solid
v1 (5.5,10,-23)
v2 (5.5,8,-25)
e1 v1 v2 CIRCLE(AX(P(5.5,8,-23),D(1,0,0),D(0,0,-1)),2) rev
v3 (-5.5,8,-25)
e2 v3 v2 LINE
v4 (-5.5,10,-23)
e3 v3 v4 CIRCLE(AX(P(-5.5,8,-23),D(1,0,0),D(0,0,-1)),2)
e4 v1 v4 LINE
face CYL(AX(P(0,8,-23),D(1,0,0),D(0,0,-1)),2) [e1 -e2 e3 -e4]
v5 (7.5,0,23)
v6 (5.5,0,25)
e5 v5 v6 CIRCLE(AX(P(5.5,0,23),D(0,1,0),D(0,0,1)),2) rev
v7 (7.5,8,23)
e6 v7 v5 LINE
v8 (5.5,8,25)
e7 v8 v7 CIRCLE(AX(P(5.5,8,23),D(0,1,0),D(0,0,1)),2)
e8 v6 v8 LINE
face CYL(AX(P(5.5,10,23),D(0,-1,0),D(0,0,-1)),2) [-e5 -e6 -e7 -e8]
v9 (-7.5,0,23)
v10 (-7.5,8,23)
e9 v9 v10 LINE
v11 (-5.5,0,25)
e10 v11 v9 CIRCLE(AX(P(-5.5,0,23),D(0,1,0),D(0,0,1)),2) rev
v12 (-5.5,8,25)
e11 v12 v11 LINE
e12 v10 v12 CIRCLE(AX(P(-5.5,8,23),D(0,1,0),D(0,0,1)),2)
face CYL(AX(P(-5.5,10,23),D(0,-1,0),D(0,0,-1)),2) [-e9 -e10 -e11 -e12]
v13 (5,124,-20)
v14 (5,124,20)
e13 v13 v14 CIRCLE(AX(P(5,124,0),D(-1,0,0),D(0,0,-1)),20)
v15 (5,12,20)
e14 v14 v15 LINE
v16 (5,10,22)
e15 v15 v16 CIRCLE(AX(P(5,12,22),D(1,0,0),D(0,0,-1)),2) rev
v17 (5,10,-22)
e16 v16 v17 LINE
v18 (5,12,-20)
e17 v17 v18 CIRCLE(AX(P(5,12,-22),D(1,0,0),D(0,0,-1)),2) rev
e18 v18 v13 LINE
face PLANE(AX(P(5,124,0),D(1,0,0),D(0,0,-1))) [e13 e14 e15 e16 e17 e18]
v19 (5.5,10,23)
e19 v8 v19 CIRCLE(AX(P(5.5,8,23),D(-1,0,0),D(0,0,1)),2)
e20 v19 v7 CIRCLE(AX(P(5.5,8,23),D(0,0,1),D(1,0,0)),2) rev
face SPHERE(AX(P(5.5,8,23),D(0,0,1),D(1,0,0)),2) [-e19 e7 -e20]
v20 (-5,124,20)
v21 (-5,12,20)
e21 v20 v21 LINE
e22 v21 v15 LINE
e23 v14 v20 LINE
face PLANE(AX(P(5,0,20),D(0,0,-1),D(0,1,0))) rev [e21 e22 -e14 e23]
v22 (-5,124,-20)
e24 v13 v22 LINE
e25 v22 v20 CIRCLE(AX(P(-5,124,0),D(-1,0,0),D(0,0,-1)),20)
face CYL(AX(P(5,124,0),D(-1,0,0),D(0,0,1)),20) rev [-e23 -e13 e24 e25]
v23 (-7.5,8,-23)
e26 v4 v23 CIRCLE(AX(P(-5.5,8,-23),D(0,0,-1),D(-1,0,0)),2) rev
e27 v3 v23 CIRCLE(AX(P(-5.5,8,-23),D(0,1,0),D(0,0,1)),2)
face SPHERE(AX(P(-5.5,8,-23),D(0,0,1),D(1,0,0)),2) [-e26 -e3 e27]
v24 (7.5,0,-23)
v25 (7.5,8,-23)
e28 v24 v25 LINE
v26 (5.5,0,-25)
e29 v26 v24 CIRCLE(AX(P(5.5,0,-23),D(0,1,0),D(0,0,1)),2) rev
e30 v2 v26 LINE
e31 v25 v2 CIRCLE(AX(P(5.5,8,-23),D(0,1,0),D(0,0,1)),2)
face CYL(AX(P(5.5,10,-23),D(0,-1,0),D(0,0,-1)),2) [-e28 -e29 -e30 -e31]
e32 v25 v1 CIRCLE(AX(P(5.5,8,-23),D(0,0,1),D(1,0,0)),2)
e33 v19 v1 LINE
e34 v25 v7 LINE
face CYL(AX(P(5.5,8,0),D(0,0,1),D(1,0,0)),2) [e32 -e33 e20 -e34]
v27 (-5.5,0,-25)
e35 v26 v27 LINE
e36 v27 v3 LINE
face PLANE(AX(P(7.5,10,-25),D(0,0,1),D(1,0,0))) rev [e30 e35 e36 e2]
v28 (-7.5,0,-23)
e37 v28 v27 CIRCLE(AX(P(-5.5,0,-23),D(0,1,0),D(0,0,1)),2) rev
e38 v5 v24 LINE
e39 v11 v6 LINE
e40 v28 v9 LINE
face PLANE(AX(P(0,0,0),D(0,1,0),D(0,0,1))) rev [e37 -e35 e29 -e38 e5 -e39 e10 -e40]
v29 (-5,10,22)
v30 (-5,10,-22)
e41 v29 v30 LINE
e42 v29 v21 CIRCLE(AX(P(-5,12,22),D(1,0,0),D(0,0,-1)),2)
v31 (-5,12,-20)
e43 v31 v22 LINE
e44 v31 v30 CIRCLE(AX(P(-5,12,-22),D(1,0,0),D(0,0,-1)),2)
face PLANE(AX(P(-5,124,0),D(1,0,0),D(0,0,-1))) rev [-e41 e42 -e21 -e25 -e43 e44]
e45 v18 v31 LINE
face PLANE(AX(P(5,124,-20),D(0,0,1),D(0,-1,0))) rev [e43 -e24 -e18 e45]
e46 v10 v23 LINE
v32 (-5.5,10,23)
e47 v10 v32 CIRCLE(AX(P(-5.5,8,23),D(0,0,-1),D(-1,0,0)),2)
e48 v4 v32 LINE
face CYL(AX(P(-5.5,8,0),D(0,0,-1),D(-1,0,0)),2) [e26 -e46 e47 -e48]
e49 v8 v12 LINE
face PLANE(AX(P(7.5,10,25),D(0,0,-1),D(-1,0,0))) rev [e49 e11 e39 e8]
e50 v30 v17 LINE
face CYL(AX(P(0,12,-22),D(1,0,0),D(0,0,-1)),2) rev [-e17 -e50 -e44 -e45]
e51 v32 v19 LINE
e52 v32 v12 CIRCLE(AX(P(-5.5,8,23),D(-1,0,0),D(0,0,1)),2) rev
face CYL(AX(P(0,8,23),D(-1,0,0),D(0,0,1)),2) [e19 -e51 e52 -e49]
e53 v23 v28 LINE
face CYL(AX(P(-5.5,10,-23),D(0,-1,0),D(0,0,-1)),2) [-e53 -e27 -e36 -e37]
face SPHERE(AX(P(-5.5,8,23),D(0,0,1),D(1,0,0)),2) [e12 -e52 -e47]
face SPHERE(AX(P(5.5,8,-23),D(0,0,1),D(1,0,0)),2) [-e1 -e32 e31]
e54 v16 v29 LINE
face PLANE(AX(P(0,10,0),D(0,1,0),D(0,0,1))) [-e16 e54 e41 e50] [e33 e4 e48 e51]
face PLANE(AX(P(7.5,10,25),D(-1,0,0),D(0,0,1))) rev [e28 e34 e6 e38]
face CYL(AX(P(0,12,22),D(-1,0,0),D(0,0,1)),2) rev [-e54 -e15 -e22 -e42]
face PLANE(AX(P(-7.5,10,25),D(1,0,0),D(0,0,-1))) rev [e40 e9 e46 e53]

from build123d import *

# Parameters (mm, degrees)
SKETCH_1_W      = 15
SKETCH_1_H      = 50
EXTRUDE_1_DEPTH = 10
FILLET_1_R      = 2
FILLET_2_R      = 2
EXTRUDE_3_DEPTH = 5
FILLET_3_R      = 2


with BuildPart() as part:
    # 스케치1 → 보스-돌출1 (new body)
    with BuildSketch(Plane(origin=(0, 0, 0), x_dir=(1, 0, 0), z_dir=(0, 1, 0))):
        Rectangle(SKETCH_1_W, SKETCH_1_H)
    extrude(amount=EXTRUDE_1_DEPTH)

    # 필렛1
    fillet_1_edges = [part.edges().sort_by_distance(p)[0] for p in [
        (7.5, 10, 0),
        (0, 10, -25),
        (-7.5, 10, 0),
        (0, 10, 25),
    ]]
    fillet(fillet_1_edges, radius=FILLET_1_R)

    # 필렛2
    # the kernel refuses this fillet: 2 mm, written as the material it takes off along each edge
    with BuildSketch(Plane(origin=(-5.5, 8, 23), x_dir=(-1, 0, 0), z_dir=(0, 0, 1))) as fillet_2_piece_1_section:
        Polygon((0, 0), (FILLET_2_R, 0), (FILLET_2_R, -FILLET_2_R), (0, -FILLET_2_R), align=None)
    fillet_2_piece_1 = extrude(amount=FILLET_2_R, mode=Mode.PRIVATE)
    fillet_2_piece_1 = fillet_2_piece_1 - Plane(origin=(-5.5, 8, 23), x_dir=(0.7071067811865475, -0.7071067811865475, 0), z_dir=(0, 0, 1)) * Sphere(FILLET_2_R, mode=Mode.PRIVATE)
    add(fillet_2_piece_1, mode=Mode.SUBTRACT)
    with BuildSketch(Plane(origin=(-5.5, 8, -23), x_dir=(0, 0, -1), z_dir=(-1, 0, 0))) as fillet_2_piece_2_section:
        Polygon((0, 0), (FILLET_2_R, 0), (FILLET_2_R, -FILLET_2_R), (0, -FILLET_2_R), align=None)
    fillet_2_piece_2 = extrude(amount=FILLET_2_R, mode=Mode.PRIVATE)
    fillet_2_piece_2 = fillet_2_piece_2 - Plane(origin=(-5.5, 8, -23), x_dir=(0, -0.7071067811865475, 0.7071067811865475), z_dir=(-1, 0, 0)) * Sphere(FILLET_2_R, mode=Mode.PRIVATE)
    add(fillet_2_piece_2, mode=Mode.SUBTRACT)
    with BuildSketch(Plane(origin=(5.5, 8, 23), x_dir=(1, 0, 0), z_dir=(0, 0, 1))) as fillet_2_piece_3_section:
        Polygon((0, 0), (FILLET_2_R, 0), (FILLET_2_R, FILLET_2_R), (0, FILLET_2_R), align=None)
    fillet_2_piece_3 = extrude(amount=FILLET_2_R, mode=Mode.PRIVATE)
    fillet_2_piece_3 = fillet_2_piece_3 - Plane(origin=(5.5, 8, 23), x_dir=(-0.7071067811865475, -0.7071067811865475, 0), z_dir=(0, 0, 1)) * Sphere(FILLET_2_R, mode=Mode.PRIVATE)
    add(fillet_2_piece_3, mode=Mode.SUBTRACT)
    with BuildSketch(Plane(origin=(5.5, 8, -23), x_dir=(0, 0, -1), z_dir=(1, 0, 0))) as fillet_2_piece_4_section:
        Polygon((0, 0), (FILLET_2_R, 0), (FILLET_2_R, FILLET_2_R), (0, FILLET_2_R), align=None)
    fillet_2_piece_4 = extrude(amount=FILLET_2_R, mode=Mode.PRIVATE)
    fillet_2_piece_4 = fillet_2_piece_4 - Plane(origin=(5.5, 8, -23), x_dir=(0, -0.7071067811865475, 0.7071067811865475), z_dir=(1, 0, 0)) * Sphere(FILLET_2_R, mode=Mode.PRIVATE)
    add(fillet_2_piece_4, mode=Mode.SUBTRACT)
    with BuildSketch(Plane(origin=(7.5, -5, -25), x_dir=(0, 0, 1), z_dir=(0, 1, 0)), Plane(origin=(7.5, -5, 25), x_dir=(-1, 0, 0), z_dir=(0, 1, 0))) as fillet_2_piece_5:
        with BuildLine():
            CenterArc((FILLET_2_R, -FILLET_2_R), FILLET_2_R, 90, 90)
            Line((0, -FILLET_2_R), (0, 0))
            Line((0, 0), (FILLET_2_R, 0))
        make_face()
    extrude(amount=13, mode=Mode.SUBTRACT)
    with BuildSketch(Plane(origin=(-7.5, -5, 25), x_dir=(1, 0, 0), z_dir=(0, 1, 0)), Plane(origin=(-7.5, -5, -25), x_dir=(0, 0, 1), z_dir=(0, 1, 0))) as fillet_2_piece_6:
        with BuildLine():
            CenterArc((FILLET_2_R, FILLET_2_R), FILLET_2_R, 180, 90)
            Line((0, FILLET_2_R), (0, 0))
            Line((0, 0), (FILLET_2_R, 0))
        make_face()
    extrude(amount=13, mode=Mode.SUBTRACT)

    # 스케치4 → 보스-돌출3 (add, symmetric)
    with BuildSketch(Plane(origin=(0, 0, 0), x_dir=(0, 0, -1), z_dir=(1, 0, 0))):
        with BuildLine():
            Line((20, 0), (-20, 0))
            Line((-20, 0), (-20, 104))
            Line((-20, 104), (-20, 124))
            ThreePointArc((-20, 124), (0, 104), (20, 124))
            Line((20, 124), (20, 104))
            Line((20, 104), (20, 0))
        make_face()
    extrude(amount=EXTRUDE_3_DEPTH, both=True)

    # 필렛3
    fillet_3_edges = [part.edges().sort_by_distance(p)[0] for p in [
        (0, 10, -20),
        (0, 10, 20),
    ]]
    fillet(fillet_3_edges, radius=FILLET_3_R)


solid = part.part
